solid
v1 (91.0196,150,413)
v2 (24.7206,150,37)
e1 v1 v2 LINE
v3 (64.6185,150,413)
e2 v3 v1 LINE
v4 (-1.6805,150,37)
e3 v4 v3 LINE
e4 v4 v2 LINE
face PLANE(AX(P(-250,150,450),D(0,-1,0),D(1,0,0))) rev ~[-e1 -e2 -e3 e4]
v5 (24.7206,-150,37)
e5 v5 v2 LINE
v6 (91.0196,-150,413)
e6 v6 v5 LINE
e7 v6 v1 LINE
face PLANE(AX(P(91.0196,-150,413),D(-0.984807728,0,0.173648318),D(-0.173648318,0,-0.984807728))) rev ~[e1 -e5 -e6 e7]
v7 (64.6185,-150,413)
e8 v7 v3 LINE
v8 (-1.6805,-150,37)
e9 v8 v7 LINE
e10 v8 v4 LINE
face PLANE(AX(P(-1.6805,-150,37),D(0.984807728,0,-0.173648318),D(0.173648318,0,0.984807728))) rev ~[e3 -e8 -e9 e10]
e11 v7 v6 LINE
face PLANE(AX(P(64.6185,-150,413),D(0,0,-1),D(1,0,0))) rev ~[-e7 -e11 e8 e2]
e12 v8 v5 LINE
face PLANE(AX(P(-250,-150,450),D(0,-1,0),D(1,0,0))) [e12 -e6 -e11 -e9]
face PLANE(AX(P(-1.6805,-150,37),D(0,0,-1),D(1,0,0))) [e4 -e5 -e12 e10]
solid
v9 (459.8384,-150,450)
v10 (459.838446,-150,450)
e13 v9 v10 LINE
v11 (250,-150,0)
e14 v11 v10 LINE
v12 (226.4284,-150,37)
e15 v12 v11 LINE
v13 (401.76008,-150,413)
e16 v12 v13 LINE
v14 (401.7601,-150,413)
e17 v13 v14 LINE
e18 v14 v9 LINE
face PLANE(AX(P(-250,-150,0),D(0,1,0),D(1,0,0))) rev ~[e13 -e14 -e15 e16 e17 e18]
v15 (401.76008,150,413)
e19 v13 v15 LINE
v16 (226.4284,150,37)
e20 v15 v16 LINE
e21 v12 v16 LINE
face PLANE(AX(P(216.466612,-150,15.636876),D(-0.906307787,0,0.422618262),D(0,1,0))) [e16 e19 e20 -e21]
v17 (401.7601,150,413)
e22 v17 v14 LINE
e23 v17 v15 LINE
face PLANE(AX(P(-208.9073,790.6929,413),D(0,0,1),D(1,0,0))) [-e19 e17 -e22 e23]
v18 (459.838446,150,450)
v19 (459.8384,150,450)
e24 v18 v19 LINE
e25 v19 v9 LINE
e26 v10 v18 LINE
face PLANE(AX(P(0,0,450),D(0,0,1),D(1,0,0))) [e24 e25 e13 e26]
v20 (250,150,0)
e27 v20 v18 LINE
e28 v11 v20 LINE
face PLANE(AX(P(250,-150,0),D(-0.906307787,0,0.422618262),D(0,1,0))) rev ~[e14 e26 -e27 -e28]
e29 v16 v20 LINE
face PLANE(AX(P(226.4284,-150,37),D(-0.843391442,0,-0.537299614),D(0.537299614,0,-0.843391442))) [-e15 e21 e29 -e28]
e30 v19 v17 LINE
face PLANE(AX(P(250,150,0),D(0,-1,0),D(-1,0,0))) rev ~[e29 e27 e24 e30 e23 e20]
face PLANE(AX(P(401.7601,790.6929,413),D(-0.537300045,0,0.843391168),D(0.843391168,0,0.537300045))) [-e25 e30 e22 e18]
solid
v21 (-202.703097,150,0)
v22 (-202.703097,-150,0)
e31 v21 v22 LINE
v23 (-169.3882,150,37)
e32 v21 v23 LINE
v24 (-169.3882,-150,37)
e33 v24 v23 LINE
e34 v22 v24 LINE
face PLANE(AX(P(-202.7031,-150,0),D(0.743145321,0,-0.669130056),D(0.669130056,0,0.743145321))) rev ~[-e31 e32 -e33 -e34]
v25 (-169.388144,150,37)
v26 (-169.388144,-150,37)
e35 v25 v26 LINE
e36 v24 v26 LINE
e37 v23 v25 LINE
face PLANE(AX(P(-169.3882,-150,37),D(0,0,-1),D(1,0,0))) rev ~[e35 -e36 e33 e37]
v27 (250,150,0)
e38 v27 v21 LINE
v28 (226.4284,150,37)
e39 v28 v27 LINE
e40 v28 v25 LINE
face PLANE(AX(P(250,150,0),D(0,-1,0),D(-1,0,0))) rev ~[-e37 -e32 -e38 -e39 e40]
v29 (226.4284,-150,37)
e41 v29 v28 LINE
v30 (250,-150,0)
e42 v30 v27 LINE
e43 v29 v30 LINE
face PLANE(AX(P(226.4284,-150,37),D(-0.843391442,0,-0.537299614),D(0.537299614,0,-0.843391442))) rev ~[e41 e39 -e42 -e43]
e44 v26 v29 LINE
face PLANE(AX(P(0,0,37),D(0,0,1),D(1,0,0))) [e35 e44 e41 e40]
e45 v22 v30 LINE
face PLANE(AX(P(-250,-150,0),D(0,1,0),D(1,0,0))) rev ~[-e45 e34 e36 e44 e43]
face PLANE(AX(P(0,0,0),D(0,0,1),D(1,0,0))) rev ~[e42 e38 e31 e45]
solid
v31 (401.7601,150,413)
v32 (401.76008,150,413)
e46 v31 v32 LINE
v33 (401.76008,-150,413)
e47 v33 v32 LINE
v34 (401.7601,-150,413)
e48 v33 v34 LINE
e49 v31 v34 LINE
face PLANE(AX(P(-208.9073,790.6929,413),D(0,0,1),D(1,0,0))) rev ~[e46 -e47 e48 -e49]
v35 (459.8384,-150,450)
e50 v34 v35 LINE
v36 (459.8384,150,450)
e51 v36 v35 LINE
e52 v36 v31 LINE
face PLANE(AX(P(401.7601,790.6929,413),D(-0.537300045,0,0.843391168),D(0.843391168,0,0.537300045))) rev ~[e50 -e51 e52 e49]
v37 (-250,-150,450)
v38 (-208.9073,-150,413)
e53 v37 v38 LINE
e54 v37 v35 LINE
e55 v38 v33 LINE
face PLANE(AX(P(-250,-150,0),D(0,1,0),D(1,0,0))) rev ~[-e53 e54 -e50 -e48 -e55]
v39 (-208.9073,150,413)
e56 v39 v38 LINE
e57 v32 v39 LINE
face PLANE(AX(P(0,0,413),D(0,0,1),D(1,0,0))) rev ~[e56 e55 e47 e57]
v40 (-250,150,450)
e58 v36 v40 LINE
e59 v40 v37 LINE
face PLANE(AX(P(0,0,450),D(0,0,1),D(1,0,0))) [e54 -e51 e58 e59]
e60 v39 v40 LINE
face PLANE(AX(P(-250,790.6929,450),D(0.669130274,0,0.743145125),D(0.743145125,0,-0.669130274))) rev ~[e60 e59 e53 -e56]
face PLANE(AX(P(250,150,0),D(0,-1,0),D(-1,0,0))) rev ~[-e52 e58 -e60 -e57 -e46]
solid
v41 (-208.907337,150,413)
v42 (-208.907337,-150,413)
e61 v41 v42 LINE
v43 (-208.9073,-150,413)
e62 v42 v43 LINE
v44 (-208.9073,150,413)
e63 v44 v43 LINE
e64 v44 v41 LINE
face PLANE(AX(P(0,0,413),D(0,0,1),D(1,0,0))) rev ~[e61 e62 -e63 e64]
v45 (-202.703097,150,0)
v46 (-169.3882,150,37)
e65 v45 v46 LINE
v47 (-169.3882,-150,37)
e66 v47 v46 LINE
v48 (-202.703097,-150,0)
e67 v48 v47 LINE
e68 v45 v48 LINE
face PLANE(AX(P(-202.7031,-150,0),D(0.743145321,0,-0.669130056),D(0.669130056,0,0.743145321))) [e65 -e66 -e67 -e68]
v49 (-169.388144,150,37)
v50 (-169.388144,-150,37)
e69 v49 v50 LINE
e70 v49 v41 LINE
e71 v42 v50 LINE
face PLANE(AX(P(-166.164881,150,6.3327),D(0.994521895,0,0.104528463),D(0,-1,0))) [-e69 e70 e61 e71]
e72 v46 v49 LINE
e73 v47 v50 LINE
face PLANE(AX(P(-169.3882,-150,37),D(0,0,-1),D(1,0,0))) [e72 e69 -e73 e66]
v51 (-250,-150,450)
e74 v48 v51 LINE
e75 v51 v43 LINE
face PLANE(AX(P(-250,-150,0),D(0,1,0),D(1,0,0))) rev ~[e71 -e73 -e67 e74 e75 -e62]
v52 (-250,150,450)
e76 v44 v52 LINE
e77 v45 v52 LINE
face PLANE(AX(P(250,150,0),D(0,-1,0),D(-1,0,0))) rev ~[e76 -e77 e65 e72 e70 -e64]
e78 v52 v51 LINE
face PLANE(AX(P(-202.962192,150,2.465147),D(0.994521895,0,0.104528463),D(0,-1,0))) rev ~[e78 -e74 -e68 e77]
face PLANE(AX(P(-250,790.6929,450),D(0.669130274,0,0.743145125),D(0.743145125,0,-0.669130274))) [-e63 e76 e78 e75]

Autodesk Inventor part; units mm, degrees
ref_plane "YZ Plane" through (0, 0, 0) normal (1, 0, 0) x (0, 1, 0)
ref_plane "XZ Plane" through (0, 0, 0) normal (0, 1, 0) x (-1, 0, 0)
ref_plane "XY Plane" through (0, 0, 0) normal (0, 0, 1) x (1, 0, 0)
sketch "Sketch1" plane through (0, 0, 0) normal (0, 0, 1) x (1, 0, 0)
  line L0 (-250, -150) -> (250, -150)
  line L1 (250, -150) -> (250, 150)
  line L2 (250, 150) -> (-250, 150)
  line L3 (-250, 150) -> (-250, -150)
  line L4 (-250, -150) -> (250, 150) construction
  line L5 (250, -150) -> (-250, 150) construction
  point P0 (0, 0)
  dimension "d0" = 500
  dimension "d1" = 300
extrude "Extrusion1" add sketch "Sketch1" along normal blind 450
draft "FaceDraft1" angle 25 pull direction (0, 0, -1) faces at (250, -50, 150) fixed edges at (250, 0, 0)
draft "FaceDraft2" angle 6 pull direction (0, 0, -1) faces at (-250, 50, 150) fixed edges at (-250, 0, 450)
shell "Shell1" thickness 37 removed faces 2 at (153.2795, -150, 300) at (153.2795, 150, 300)
sketch "Sketch2" plane through (-202.7031, -150, 0) normal (0, -1, 0) x (1, 0, 0)
  line L0 (-6.2042, 413) -> (604.4632, 413) construction
  line L1 (-47.2969, 450) -> (-6.2042, 413)
  line L2 (-6.2042, 413) -> (604.4632, 413)
  line L3 (604.4632, 413) -> (662.5415, 450)
  line L4 (0, 0) -> (33.3149, 37)
  line L5 (33.3149, 37) -> (429.1315, 37)
  line L6 (429.1315, 37) -> (452.7031, 0)
  point P0 (202.7031, 0)
surface extrude "ExtrusionSrf1" sketch "Sketch2" against normal up to surface (300 mm away) shown yes curves L1 L2 L3
surface extrude "ExtrusionSrf2" sketch "Sketch2" against normal up to surface (300 mm away) shown yes curves L4 L5 L6
split body "Split1" sketch "Sketch2" result two bodies curves L1 L2 L3 first body at (-13.3872, 50, 449.5)
split body "Split2" result two bodies by surface "ExtrusionSrf2" bodies 3 first body at (99.099, -50, 0.5)
sketch "Sketch3" plane through (-250, -150, 450) normal (0, -1, 0) x (1, 0, 0)
  line L0 (314.6185, -37) -> (341.0196, -37)
  line L1 (341.0196, -37) -> (274.7206, -413)
  line L2 (80.6119, -413) -> (476.4284, -413) projected
  line L3 (248.3195, -413) -> (314.6185, -37)
  line L4 (41.0927, -37) -> (651.7601, -37) projected
  line L5 (651.7601, -37) -> (476.4284, -413) projected
  point P0 (250, -450)
  dimension "d11" = 26
  dimension "d14" = 80
extrude "Extrusion2" add sketch "Sketch3" against normal up to surface (300 mm away) separate body contours L0 L1 L2 L3
properties part number "Slant Box"
